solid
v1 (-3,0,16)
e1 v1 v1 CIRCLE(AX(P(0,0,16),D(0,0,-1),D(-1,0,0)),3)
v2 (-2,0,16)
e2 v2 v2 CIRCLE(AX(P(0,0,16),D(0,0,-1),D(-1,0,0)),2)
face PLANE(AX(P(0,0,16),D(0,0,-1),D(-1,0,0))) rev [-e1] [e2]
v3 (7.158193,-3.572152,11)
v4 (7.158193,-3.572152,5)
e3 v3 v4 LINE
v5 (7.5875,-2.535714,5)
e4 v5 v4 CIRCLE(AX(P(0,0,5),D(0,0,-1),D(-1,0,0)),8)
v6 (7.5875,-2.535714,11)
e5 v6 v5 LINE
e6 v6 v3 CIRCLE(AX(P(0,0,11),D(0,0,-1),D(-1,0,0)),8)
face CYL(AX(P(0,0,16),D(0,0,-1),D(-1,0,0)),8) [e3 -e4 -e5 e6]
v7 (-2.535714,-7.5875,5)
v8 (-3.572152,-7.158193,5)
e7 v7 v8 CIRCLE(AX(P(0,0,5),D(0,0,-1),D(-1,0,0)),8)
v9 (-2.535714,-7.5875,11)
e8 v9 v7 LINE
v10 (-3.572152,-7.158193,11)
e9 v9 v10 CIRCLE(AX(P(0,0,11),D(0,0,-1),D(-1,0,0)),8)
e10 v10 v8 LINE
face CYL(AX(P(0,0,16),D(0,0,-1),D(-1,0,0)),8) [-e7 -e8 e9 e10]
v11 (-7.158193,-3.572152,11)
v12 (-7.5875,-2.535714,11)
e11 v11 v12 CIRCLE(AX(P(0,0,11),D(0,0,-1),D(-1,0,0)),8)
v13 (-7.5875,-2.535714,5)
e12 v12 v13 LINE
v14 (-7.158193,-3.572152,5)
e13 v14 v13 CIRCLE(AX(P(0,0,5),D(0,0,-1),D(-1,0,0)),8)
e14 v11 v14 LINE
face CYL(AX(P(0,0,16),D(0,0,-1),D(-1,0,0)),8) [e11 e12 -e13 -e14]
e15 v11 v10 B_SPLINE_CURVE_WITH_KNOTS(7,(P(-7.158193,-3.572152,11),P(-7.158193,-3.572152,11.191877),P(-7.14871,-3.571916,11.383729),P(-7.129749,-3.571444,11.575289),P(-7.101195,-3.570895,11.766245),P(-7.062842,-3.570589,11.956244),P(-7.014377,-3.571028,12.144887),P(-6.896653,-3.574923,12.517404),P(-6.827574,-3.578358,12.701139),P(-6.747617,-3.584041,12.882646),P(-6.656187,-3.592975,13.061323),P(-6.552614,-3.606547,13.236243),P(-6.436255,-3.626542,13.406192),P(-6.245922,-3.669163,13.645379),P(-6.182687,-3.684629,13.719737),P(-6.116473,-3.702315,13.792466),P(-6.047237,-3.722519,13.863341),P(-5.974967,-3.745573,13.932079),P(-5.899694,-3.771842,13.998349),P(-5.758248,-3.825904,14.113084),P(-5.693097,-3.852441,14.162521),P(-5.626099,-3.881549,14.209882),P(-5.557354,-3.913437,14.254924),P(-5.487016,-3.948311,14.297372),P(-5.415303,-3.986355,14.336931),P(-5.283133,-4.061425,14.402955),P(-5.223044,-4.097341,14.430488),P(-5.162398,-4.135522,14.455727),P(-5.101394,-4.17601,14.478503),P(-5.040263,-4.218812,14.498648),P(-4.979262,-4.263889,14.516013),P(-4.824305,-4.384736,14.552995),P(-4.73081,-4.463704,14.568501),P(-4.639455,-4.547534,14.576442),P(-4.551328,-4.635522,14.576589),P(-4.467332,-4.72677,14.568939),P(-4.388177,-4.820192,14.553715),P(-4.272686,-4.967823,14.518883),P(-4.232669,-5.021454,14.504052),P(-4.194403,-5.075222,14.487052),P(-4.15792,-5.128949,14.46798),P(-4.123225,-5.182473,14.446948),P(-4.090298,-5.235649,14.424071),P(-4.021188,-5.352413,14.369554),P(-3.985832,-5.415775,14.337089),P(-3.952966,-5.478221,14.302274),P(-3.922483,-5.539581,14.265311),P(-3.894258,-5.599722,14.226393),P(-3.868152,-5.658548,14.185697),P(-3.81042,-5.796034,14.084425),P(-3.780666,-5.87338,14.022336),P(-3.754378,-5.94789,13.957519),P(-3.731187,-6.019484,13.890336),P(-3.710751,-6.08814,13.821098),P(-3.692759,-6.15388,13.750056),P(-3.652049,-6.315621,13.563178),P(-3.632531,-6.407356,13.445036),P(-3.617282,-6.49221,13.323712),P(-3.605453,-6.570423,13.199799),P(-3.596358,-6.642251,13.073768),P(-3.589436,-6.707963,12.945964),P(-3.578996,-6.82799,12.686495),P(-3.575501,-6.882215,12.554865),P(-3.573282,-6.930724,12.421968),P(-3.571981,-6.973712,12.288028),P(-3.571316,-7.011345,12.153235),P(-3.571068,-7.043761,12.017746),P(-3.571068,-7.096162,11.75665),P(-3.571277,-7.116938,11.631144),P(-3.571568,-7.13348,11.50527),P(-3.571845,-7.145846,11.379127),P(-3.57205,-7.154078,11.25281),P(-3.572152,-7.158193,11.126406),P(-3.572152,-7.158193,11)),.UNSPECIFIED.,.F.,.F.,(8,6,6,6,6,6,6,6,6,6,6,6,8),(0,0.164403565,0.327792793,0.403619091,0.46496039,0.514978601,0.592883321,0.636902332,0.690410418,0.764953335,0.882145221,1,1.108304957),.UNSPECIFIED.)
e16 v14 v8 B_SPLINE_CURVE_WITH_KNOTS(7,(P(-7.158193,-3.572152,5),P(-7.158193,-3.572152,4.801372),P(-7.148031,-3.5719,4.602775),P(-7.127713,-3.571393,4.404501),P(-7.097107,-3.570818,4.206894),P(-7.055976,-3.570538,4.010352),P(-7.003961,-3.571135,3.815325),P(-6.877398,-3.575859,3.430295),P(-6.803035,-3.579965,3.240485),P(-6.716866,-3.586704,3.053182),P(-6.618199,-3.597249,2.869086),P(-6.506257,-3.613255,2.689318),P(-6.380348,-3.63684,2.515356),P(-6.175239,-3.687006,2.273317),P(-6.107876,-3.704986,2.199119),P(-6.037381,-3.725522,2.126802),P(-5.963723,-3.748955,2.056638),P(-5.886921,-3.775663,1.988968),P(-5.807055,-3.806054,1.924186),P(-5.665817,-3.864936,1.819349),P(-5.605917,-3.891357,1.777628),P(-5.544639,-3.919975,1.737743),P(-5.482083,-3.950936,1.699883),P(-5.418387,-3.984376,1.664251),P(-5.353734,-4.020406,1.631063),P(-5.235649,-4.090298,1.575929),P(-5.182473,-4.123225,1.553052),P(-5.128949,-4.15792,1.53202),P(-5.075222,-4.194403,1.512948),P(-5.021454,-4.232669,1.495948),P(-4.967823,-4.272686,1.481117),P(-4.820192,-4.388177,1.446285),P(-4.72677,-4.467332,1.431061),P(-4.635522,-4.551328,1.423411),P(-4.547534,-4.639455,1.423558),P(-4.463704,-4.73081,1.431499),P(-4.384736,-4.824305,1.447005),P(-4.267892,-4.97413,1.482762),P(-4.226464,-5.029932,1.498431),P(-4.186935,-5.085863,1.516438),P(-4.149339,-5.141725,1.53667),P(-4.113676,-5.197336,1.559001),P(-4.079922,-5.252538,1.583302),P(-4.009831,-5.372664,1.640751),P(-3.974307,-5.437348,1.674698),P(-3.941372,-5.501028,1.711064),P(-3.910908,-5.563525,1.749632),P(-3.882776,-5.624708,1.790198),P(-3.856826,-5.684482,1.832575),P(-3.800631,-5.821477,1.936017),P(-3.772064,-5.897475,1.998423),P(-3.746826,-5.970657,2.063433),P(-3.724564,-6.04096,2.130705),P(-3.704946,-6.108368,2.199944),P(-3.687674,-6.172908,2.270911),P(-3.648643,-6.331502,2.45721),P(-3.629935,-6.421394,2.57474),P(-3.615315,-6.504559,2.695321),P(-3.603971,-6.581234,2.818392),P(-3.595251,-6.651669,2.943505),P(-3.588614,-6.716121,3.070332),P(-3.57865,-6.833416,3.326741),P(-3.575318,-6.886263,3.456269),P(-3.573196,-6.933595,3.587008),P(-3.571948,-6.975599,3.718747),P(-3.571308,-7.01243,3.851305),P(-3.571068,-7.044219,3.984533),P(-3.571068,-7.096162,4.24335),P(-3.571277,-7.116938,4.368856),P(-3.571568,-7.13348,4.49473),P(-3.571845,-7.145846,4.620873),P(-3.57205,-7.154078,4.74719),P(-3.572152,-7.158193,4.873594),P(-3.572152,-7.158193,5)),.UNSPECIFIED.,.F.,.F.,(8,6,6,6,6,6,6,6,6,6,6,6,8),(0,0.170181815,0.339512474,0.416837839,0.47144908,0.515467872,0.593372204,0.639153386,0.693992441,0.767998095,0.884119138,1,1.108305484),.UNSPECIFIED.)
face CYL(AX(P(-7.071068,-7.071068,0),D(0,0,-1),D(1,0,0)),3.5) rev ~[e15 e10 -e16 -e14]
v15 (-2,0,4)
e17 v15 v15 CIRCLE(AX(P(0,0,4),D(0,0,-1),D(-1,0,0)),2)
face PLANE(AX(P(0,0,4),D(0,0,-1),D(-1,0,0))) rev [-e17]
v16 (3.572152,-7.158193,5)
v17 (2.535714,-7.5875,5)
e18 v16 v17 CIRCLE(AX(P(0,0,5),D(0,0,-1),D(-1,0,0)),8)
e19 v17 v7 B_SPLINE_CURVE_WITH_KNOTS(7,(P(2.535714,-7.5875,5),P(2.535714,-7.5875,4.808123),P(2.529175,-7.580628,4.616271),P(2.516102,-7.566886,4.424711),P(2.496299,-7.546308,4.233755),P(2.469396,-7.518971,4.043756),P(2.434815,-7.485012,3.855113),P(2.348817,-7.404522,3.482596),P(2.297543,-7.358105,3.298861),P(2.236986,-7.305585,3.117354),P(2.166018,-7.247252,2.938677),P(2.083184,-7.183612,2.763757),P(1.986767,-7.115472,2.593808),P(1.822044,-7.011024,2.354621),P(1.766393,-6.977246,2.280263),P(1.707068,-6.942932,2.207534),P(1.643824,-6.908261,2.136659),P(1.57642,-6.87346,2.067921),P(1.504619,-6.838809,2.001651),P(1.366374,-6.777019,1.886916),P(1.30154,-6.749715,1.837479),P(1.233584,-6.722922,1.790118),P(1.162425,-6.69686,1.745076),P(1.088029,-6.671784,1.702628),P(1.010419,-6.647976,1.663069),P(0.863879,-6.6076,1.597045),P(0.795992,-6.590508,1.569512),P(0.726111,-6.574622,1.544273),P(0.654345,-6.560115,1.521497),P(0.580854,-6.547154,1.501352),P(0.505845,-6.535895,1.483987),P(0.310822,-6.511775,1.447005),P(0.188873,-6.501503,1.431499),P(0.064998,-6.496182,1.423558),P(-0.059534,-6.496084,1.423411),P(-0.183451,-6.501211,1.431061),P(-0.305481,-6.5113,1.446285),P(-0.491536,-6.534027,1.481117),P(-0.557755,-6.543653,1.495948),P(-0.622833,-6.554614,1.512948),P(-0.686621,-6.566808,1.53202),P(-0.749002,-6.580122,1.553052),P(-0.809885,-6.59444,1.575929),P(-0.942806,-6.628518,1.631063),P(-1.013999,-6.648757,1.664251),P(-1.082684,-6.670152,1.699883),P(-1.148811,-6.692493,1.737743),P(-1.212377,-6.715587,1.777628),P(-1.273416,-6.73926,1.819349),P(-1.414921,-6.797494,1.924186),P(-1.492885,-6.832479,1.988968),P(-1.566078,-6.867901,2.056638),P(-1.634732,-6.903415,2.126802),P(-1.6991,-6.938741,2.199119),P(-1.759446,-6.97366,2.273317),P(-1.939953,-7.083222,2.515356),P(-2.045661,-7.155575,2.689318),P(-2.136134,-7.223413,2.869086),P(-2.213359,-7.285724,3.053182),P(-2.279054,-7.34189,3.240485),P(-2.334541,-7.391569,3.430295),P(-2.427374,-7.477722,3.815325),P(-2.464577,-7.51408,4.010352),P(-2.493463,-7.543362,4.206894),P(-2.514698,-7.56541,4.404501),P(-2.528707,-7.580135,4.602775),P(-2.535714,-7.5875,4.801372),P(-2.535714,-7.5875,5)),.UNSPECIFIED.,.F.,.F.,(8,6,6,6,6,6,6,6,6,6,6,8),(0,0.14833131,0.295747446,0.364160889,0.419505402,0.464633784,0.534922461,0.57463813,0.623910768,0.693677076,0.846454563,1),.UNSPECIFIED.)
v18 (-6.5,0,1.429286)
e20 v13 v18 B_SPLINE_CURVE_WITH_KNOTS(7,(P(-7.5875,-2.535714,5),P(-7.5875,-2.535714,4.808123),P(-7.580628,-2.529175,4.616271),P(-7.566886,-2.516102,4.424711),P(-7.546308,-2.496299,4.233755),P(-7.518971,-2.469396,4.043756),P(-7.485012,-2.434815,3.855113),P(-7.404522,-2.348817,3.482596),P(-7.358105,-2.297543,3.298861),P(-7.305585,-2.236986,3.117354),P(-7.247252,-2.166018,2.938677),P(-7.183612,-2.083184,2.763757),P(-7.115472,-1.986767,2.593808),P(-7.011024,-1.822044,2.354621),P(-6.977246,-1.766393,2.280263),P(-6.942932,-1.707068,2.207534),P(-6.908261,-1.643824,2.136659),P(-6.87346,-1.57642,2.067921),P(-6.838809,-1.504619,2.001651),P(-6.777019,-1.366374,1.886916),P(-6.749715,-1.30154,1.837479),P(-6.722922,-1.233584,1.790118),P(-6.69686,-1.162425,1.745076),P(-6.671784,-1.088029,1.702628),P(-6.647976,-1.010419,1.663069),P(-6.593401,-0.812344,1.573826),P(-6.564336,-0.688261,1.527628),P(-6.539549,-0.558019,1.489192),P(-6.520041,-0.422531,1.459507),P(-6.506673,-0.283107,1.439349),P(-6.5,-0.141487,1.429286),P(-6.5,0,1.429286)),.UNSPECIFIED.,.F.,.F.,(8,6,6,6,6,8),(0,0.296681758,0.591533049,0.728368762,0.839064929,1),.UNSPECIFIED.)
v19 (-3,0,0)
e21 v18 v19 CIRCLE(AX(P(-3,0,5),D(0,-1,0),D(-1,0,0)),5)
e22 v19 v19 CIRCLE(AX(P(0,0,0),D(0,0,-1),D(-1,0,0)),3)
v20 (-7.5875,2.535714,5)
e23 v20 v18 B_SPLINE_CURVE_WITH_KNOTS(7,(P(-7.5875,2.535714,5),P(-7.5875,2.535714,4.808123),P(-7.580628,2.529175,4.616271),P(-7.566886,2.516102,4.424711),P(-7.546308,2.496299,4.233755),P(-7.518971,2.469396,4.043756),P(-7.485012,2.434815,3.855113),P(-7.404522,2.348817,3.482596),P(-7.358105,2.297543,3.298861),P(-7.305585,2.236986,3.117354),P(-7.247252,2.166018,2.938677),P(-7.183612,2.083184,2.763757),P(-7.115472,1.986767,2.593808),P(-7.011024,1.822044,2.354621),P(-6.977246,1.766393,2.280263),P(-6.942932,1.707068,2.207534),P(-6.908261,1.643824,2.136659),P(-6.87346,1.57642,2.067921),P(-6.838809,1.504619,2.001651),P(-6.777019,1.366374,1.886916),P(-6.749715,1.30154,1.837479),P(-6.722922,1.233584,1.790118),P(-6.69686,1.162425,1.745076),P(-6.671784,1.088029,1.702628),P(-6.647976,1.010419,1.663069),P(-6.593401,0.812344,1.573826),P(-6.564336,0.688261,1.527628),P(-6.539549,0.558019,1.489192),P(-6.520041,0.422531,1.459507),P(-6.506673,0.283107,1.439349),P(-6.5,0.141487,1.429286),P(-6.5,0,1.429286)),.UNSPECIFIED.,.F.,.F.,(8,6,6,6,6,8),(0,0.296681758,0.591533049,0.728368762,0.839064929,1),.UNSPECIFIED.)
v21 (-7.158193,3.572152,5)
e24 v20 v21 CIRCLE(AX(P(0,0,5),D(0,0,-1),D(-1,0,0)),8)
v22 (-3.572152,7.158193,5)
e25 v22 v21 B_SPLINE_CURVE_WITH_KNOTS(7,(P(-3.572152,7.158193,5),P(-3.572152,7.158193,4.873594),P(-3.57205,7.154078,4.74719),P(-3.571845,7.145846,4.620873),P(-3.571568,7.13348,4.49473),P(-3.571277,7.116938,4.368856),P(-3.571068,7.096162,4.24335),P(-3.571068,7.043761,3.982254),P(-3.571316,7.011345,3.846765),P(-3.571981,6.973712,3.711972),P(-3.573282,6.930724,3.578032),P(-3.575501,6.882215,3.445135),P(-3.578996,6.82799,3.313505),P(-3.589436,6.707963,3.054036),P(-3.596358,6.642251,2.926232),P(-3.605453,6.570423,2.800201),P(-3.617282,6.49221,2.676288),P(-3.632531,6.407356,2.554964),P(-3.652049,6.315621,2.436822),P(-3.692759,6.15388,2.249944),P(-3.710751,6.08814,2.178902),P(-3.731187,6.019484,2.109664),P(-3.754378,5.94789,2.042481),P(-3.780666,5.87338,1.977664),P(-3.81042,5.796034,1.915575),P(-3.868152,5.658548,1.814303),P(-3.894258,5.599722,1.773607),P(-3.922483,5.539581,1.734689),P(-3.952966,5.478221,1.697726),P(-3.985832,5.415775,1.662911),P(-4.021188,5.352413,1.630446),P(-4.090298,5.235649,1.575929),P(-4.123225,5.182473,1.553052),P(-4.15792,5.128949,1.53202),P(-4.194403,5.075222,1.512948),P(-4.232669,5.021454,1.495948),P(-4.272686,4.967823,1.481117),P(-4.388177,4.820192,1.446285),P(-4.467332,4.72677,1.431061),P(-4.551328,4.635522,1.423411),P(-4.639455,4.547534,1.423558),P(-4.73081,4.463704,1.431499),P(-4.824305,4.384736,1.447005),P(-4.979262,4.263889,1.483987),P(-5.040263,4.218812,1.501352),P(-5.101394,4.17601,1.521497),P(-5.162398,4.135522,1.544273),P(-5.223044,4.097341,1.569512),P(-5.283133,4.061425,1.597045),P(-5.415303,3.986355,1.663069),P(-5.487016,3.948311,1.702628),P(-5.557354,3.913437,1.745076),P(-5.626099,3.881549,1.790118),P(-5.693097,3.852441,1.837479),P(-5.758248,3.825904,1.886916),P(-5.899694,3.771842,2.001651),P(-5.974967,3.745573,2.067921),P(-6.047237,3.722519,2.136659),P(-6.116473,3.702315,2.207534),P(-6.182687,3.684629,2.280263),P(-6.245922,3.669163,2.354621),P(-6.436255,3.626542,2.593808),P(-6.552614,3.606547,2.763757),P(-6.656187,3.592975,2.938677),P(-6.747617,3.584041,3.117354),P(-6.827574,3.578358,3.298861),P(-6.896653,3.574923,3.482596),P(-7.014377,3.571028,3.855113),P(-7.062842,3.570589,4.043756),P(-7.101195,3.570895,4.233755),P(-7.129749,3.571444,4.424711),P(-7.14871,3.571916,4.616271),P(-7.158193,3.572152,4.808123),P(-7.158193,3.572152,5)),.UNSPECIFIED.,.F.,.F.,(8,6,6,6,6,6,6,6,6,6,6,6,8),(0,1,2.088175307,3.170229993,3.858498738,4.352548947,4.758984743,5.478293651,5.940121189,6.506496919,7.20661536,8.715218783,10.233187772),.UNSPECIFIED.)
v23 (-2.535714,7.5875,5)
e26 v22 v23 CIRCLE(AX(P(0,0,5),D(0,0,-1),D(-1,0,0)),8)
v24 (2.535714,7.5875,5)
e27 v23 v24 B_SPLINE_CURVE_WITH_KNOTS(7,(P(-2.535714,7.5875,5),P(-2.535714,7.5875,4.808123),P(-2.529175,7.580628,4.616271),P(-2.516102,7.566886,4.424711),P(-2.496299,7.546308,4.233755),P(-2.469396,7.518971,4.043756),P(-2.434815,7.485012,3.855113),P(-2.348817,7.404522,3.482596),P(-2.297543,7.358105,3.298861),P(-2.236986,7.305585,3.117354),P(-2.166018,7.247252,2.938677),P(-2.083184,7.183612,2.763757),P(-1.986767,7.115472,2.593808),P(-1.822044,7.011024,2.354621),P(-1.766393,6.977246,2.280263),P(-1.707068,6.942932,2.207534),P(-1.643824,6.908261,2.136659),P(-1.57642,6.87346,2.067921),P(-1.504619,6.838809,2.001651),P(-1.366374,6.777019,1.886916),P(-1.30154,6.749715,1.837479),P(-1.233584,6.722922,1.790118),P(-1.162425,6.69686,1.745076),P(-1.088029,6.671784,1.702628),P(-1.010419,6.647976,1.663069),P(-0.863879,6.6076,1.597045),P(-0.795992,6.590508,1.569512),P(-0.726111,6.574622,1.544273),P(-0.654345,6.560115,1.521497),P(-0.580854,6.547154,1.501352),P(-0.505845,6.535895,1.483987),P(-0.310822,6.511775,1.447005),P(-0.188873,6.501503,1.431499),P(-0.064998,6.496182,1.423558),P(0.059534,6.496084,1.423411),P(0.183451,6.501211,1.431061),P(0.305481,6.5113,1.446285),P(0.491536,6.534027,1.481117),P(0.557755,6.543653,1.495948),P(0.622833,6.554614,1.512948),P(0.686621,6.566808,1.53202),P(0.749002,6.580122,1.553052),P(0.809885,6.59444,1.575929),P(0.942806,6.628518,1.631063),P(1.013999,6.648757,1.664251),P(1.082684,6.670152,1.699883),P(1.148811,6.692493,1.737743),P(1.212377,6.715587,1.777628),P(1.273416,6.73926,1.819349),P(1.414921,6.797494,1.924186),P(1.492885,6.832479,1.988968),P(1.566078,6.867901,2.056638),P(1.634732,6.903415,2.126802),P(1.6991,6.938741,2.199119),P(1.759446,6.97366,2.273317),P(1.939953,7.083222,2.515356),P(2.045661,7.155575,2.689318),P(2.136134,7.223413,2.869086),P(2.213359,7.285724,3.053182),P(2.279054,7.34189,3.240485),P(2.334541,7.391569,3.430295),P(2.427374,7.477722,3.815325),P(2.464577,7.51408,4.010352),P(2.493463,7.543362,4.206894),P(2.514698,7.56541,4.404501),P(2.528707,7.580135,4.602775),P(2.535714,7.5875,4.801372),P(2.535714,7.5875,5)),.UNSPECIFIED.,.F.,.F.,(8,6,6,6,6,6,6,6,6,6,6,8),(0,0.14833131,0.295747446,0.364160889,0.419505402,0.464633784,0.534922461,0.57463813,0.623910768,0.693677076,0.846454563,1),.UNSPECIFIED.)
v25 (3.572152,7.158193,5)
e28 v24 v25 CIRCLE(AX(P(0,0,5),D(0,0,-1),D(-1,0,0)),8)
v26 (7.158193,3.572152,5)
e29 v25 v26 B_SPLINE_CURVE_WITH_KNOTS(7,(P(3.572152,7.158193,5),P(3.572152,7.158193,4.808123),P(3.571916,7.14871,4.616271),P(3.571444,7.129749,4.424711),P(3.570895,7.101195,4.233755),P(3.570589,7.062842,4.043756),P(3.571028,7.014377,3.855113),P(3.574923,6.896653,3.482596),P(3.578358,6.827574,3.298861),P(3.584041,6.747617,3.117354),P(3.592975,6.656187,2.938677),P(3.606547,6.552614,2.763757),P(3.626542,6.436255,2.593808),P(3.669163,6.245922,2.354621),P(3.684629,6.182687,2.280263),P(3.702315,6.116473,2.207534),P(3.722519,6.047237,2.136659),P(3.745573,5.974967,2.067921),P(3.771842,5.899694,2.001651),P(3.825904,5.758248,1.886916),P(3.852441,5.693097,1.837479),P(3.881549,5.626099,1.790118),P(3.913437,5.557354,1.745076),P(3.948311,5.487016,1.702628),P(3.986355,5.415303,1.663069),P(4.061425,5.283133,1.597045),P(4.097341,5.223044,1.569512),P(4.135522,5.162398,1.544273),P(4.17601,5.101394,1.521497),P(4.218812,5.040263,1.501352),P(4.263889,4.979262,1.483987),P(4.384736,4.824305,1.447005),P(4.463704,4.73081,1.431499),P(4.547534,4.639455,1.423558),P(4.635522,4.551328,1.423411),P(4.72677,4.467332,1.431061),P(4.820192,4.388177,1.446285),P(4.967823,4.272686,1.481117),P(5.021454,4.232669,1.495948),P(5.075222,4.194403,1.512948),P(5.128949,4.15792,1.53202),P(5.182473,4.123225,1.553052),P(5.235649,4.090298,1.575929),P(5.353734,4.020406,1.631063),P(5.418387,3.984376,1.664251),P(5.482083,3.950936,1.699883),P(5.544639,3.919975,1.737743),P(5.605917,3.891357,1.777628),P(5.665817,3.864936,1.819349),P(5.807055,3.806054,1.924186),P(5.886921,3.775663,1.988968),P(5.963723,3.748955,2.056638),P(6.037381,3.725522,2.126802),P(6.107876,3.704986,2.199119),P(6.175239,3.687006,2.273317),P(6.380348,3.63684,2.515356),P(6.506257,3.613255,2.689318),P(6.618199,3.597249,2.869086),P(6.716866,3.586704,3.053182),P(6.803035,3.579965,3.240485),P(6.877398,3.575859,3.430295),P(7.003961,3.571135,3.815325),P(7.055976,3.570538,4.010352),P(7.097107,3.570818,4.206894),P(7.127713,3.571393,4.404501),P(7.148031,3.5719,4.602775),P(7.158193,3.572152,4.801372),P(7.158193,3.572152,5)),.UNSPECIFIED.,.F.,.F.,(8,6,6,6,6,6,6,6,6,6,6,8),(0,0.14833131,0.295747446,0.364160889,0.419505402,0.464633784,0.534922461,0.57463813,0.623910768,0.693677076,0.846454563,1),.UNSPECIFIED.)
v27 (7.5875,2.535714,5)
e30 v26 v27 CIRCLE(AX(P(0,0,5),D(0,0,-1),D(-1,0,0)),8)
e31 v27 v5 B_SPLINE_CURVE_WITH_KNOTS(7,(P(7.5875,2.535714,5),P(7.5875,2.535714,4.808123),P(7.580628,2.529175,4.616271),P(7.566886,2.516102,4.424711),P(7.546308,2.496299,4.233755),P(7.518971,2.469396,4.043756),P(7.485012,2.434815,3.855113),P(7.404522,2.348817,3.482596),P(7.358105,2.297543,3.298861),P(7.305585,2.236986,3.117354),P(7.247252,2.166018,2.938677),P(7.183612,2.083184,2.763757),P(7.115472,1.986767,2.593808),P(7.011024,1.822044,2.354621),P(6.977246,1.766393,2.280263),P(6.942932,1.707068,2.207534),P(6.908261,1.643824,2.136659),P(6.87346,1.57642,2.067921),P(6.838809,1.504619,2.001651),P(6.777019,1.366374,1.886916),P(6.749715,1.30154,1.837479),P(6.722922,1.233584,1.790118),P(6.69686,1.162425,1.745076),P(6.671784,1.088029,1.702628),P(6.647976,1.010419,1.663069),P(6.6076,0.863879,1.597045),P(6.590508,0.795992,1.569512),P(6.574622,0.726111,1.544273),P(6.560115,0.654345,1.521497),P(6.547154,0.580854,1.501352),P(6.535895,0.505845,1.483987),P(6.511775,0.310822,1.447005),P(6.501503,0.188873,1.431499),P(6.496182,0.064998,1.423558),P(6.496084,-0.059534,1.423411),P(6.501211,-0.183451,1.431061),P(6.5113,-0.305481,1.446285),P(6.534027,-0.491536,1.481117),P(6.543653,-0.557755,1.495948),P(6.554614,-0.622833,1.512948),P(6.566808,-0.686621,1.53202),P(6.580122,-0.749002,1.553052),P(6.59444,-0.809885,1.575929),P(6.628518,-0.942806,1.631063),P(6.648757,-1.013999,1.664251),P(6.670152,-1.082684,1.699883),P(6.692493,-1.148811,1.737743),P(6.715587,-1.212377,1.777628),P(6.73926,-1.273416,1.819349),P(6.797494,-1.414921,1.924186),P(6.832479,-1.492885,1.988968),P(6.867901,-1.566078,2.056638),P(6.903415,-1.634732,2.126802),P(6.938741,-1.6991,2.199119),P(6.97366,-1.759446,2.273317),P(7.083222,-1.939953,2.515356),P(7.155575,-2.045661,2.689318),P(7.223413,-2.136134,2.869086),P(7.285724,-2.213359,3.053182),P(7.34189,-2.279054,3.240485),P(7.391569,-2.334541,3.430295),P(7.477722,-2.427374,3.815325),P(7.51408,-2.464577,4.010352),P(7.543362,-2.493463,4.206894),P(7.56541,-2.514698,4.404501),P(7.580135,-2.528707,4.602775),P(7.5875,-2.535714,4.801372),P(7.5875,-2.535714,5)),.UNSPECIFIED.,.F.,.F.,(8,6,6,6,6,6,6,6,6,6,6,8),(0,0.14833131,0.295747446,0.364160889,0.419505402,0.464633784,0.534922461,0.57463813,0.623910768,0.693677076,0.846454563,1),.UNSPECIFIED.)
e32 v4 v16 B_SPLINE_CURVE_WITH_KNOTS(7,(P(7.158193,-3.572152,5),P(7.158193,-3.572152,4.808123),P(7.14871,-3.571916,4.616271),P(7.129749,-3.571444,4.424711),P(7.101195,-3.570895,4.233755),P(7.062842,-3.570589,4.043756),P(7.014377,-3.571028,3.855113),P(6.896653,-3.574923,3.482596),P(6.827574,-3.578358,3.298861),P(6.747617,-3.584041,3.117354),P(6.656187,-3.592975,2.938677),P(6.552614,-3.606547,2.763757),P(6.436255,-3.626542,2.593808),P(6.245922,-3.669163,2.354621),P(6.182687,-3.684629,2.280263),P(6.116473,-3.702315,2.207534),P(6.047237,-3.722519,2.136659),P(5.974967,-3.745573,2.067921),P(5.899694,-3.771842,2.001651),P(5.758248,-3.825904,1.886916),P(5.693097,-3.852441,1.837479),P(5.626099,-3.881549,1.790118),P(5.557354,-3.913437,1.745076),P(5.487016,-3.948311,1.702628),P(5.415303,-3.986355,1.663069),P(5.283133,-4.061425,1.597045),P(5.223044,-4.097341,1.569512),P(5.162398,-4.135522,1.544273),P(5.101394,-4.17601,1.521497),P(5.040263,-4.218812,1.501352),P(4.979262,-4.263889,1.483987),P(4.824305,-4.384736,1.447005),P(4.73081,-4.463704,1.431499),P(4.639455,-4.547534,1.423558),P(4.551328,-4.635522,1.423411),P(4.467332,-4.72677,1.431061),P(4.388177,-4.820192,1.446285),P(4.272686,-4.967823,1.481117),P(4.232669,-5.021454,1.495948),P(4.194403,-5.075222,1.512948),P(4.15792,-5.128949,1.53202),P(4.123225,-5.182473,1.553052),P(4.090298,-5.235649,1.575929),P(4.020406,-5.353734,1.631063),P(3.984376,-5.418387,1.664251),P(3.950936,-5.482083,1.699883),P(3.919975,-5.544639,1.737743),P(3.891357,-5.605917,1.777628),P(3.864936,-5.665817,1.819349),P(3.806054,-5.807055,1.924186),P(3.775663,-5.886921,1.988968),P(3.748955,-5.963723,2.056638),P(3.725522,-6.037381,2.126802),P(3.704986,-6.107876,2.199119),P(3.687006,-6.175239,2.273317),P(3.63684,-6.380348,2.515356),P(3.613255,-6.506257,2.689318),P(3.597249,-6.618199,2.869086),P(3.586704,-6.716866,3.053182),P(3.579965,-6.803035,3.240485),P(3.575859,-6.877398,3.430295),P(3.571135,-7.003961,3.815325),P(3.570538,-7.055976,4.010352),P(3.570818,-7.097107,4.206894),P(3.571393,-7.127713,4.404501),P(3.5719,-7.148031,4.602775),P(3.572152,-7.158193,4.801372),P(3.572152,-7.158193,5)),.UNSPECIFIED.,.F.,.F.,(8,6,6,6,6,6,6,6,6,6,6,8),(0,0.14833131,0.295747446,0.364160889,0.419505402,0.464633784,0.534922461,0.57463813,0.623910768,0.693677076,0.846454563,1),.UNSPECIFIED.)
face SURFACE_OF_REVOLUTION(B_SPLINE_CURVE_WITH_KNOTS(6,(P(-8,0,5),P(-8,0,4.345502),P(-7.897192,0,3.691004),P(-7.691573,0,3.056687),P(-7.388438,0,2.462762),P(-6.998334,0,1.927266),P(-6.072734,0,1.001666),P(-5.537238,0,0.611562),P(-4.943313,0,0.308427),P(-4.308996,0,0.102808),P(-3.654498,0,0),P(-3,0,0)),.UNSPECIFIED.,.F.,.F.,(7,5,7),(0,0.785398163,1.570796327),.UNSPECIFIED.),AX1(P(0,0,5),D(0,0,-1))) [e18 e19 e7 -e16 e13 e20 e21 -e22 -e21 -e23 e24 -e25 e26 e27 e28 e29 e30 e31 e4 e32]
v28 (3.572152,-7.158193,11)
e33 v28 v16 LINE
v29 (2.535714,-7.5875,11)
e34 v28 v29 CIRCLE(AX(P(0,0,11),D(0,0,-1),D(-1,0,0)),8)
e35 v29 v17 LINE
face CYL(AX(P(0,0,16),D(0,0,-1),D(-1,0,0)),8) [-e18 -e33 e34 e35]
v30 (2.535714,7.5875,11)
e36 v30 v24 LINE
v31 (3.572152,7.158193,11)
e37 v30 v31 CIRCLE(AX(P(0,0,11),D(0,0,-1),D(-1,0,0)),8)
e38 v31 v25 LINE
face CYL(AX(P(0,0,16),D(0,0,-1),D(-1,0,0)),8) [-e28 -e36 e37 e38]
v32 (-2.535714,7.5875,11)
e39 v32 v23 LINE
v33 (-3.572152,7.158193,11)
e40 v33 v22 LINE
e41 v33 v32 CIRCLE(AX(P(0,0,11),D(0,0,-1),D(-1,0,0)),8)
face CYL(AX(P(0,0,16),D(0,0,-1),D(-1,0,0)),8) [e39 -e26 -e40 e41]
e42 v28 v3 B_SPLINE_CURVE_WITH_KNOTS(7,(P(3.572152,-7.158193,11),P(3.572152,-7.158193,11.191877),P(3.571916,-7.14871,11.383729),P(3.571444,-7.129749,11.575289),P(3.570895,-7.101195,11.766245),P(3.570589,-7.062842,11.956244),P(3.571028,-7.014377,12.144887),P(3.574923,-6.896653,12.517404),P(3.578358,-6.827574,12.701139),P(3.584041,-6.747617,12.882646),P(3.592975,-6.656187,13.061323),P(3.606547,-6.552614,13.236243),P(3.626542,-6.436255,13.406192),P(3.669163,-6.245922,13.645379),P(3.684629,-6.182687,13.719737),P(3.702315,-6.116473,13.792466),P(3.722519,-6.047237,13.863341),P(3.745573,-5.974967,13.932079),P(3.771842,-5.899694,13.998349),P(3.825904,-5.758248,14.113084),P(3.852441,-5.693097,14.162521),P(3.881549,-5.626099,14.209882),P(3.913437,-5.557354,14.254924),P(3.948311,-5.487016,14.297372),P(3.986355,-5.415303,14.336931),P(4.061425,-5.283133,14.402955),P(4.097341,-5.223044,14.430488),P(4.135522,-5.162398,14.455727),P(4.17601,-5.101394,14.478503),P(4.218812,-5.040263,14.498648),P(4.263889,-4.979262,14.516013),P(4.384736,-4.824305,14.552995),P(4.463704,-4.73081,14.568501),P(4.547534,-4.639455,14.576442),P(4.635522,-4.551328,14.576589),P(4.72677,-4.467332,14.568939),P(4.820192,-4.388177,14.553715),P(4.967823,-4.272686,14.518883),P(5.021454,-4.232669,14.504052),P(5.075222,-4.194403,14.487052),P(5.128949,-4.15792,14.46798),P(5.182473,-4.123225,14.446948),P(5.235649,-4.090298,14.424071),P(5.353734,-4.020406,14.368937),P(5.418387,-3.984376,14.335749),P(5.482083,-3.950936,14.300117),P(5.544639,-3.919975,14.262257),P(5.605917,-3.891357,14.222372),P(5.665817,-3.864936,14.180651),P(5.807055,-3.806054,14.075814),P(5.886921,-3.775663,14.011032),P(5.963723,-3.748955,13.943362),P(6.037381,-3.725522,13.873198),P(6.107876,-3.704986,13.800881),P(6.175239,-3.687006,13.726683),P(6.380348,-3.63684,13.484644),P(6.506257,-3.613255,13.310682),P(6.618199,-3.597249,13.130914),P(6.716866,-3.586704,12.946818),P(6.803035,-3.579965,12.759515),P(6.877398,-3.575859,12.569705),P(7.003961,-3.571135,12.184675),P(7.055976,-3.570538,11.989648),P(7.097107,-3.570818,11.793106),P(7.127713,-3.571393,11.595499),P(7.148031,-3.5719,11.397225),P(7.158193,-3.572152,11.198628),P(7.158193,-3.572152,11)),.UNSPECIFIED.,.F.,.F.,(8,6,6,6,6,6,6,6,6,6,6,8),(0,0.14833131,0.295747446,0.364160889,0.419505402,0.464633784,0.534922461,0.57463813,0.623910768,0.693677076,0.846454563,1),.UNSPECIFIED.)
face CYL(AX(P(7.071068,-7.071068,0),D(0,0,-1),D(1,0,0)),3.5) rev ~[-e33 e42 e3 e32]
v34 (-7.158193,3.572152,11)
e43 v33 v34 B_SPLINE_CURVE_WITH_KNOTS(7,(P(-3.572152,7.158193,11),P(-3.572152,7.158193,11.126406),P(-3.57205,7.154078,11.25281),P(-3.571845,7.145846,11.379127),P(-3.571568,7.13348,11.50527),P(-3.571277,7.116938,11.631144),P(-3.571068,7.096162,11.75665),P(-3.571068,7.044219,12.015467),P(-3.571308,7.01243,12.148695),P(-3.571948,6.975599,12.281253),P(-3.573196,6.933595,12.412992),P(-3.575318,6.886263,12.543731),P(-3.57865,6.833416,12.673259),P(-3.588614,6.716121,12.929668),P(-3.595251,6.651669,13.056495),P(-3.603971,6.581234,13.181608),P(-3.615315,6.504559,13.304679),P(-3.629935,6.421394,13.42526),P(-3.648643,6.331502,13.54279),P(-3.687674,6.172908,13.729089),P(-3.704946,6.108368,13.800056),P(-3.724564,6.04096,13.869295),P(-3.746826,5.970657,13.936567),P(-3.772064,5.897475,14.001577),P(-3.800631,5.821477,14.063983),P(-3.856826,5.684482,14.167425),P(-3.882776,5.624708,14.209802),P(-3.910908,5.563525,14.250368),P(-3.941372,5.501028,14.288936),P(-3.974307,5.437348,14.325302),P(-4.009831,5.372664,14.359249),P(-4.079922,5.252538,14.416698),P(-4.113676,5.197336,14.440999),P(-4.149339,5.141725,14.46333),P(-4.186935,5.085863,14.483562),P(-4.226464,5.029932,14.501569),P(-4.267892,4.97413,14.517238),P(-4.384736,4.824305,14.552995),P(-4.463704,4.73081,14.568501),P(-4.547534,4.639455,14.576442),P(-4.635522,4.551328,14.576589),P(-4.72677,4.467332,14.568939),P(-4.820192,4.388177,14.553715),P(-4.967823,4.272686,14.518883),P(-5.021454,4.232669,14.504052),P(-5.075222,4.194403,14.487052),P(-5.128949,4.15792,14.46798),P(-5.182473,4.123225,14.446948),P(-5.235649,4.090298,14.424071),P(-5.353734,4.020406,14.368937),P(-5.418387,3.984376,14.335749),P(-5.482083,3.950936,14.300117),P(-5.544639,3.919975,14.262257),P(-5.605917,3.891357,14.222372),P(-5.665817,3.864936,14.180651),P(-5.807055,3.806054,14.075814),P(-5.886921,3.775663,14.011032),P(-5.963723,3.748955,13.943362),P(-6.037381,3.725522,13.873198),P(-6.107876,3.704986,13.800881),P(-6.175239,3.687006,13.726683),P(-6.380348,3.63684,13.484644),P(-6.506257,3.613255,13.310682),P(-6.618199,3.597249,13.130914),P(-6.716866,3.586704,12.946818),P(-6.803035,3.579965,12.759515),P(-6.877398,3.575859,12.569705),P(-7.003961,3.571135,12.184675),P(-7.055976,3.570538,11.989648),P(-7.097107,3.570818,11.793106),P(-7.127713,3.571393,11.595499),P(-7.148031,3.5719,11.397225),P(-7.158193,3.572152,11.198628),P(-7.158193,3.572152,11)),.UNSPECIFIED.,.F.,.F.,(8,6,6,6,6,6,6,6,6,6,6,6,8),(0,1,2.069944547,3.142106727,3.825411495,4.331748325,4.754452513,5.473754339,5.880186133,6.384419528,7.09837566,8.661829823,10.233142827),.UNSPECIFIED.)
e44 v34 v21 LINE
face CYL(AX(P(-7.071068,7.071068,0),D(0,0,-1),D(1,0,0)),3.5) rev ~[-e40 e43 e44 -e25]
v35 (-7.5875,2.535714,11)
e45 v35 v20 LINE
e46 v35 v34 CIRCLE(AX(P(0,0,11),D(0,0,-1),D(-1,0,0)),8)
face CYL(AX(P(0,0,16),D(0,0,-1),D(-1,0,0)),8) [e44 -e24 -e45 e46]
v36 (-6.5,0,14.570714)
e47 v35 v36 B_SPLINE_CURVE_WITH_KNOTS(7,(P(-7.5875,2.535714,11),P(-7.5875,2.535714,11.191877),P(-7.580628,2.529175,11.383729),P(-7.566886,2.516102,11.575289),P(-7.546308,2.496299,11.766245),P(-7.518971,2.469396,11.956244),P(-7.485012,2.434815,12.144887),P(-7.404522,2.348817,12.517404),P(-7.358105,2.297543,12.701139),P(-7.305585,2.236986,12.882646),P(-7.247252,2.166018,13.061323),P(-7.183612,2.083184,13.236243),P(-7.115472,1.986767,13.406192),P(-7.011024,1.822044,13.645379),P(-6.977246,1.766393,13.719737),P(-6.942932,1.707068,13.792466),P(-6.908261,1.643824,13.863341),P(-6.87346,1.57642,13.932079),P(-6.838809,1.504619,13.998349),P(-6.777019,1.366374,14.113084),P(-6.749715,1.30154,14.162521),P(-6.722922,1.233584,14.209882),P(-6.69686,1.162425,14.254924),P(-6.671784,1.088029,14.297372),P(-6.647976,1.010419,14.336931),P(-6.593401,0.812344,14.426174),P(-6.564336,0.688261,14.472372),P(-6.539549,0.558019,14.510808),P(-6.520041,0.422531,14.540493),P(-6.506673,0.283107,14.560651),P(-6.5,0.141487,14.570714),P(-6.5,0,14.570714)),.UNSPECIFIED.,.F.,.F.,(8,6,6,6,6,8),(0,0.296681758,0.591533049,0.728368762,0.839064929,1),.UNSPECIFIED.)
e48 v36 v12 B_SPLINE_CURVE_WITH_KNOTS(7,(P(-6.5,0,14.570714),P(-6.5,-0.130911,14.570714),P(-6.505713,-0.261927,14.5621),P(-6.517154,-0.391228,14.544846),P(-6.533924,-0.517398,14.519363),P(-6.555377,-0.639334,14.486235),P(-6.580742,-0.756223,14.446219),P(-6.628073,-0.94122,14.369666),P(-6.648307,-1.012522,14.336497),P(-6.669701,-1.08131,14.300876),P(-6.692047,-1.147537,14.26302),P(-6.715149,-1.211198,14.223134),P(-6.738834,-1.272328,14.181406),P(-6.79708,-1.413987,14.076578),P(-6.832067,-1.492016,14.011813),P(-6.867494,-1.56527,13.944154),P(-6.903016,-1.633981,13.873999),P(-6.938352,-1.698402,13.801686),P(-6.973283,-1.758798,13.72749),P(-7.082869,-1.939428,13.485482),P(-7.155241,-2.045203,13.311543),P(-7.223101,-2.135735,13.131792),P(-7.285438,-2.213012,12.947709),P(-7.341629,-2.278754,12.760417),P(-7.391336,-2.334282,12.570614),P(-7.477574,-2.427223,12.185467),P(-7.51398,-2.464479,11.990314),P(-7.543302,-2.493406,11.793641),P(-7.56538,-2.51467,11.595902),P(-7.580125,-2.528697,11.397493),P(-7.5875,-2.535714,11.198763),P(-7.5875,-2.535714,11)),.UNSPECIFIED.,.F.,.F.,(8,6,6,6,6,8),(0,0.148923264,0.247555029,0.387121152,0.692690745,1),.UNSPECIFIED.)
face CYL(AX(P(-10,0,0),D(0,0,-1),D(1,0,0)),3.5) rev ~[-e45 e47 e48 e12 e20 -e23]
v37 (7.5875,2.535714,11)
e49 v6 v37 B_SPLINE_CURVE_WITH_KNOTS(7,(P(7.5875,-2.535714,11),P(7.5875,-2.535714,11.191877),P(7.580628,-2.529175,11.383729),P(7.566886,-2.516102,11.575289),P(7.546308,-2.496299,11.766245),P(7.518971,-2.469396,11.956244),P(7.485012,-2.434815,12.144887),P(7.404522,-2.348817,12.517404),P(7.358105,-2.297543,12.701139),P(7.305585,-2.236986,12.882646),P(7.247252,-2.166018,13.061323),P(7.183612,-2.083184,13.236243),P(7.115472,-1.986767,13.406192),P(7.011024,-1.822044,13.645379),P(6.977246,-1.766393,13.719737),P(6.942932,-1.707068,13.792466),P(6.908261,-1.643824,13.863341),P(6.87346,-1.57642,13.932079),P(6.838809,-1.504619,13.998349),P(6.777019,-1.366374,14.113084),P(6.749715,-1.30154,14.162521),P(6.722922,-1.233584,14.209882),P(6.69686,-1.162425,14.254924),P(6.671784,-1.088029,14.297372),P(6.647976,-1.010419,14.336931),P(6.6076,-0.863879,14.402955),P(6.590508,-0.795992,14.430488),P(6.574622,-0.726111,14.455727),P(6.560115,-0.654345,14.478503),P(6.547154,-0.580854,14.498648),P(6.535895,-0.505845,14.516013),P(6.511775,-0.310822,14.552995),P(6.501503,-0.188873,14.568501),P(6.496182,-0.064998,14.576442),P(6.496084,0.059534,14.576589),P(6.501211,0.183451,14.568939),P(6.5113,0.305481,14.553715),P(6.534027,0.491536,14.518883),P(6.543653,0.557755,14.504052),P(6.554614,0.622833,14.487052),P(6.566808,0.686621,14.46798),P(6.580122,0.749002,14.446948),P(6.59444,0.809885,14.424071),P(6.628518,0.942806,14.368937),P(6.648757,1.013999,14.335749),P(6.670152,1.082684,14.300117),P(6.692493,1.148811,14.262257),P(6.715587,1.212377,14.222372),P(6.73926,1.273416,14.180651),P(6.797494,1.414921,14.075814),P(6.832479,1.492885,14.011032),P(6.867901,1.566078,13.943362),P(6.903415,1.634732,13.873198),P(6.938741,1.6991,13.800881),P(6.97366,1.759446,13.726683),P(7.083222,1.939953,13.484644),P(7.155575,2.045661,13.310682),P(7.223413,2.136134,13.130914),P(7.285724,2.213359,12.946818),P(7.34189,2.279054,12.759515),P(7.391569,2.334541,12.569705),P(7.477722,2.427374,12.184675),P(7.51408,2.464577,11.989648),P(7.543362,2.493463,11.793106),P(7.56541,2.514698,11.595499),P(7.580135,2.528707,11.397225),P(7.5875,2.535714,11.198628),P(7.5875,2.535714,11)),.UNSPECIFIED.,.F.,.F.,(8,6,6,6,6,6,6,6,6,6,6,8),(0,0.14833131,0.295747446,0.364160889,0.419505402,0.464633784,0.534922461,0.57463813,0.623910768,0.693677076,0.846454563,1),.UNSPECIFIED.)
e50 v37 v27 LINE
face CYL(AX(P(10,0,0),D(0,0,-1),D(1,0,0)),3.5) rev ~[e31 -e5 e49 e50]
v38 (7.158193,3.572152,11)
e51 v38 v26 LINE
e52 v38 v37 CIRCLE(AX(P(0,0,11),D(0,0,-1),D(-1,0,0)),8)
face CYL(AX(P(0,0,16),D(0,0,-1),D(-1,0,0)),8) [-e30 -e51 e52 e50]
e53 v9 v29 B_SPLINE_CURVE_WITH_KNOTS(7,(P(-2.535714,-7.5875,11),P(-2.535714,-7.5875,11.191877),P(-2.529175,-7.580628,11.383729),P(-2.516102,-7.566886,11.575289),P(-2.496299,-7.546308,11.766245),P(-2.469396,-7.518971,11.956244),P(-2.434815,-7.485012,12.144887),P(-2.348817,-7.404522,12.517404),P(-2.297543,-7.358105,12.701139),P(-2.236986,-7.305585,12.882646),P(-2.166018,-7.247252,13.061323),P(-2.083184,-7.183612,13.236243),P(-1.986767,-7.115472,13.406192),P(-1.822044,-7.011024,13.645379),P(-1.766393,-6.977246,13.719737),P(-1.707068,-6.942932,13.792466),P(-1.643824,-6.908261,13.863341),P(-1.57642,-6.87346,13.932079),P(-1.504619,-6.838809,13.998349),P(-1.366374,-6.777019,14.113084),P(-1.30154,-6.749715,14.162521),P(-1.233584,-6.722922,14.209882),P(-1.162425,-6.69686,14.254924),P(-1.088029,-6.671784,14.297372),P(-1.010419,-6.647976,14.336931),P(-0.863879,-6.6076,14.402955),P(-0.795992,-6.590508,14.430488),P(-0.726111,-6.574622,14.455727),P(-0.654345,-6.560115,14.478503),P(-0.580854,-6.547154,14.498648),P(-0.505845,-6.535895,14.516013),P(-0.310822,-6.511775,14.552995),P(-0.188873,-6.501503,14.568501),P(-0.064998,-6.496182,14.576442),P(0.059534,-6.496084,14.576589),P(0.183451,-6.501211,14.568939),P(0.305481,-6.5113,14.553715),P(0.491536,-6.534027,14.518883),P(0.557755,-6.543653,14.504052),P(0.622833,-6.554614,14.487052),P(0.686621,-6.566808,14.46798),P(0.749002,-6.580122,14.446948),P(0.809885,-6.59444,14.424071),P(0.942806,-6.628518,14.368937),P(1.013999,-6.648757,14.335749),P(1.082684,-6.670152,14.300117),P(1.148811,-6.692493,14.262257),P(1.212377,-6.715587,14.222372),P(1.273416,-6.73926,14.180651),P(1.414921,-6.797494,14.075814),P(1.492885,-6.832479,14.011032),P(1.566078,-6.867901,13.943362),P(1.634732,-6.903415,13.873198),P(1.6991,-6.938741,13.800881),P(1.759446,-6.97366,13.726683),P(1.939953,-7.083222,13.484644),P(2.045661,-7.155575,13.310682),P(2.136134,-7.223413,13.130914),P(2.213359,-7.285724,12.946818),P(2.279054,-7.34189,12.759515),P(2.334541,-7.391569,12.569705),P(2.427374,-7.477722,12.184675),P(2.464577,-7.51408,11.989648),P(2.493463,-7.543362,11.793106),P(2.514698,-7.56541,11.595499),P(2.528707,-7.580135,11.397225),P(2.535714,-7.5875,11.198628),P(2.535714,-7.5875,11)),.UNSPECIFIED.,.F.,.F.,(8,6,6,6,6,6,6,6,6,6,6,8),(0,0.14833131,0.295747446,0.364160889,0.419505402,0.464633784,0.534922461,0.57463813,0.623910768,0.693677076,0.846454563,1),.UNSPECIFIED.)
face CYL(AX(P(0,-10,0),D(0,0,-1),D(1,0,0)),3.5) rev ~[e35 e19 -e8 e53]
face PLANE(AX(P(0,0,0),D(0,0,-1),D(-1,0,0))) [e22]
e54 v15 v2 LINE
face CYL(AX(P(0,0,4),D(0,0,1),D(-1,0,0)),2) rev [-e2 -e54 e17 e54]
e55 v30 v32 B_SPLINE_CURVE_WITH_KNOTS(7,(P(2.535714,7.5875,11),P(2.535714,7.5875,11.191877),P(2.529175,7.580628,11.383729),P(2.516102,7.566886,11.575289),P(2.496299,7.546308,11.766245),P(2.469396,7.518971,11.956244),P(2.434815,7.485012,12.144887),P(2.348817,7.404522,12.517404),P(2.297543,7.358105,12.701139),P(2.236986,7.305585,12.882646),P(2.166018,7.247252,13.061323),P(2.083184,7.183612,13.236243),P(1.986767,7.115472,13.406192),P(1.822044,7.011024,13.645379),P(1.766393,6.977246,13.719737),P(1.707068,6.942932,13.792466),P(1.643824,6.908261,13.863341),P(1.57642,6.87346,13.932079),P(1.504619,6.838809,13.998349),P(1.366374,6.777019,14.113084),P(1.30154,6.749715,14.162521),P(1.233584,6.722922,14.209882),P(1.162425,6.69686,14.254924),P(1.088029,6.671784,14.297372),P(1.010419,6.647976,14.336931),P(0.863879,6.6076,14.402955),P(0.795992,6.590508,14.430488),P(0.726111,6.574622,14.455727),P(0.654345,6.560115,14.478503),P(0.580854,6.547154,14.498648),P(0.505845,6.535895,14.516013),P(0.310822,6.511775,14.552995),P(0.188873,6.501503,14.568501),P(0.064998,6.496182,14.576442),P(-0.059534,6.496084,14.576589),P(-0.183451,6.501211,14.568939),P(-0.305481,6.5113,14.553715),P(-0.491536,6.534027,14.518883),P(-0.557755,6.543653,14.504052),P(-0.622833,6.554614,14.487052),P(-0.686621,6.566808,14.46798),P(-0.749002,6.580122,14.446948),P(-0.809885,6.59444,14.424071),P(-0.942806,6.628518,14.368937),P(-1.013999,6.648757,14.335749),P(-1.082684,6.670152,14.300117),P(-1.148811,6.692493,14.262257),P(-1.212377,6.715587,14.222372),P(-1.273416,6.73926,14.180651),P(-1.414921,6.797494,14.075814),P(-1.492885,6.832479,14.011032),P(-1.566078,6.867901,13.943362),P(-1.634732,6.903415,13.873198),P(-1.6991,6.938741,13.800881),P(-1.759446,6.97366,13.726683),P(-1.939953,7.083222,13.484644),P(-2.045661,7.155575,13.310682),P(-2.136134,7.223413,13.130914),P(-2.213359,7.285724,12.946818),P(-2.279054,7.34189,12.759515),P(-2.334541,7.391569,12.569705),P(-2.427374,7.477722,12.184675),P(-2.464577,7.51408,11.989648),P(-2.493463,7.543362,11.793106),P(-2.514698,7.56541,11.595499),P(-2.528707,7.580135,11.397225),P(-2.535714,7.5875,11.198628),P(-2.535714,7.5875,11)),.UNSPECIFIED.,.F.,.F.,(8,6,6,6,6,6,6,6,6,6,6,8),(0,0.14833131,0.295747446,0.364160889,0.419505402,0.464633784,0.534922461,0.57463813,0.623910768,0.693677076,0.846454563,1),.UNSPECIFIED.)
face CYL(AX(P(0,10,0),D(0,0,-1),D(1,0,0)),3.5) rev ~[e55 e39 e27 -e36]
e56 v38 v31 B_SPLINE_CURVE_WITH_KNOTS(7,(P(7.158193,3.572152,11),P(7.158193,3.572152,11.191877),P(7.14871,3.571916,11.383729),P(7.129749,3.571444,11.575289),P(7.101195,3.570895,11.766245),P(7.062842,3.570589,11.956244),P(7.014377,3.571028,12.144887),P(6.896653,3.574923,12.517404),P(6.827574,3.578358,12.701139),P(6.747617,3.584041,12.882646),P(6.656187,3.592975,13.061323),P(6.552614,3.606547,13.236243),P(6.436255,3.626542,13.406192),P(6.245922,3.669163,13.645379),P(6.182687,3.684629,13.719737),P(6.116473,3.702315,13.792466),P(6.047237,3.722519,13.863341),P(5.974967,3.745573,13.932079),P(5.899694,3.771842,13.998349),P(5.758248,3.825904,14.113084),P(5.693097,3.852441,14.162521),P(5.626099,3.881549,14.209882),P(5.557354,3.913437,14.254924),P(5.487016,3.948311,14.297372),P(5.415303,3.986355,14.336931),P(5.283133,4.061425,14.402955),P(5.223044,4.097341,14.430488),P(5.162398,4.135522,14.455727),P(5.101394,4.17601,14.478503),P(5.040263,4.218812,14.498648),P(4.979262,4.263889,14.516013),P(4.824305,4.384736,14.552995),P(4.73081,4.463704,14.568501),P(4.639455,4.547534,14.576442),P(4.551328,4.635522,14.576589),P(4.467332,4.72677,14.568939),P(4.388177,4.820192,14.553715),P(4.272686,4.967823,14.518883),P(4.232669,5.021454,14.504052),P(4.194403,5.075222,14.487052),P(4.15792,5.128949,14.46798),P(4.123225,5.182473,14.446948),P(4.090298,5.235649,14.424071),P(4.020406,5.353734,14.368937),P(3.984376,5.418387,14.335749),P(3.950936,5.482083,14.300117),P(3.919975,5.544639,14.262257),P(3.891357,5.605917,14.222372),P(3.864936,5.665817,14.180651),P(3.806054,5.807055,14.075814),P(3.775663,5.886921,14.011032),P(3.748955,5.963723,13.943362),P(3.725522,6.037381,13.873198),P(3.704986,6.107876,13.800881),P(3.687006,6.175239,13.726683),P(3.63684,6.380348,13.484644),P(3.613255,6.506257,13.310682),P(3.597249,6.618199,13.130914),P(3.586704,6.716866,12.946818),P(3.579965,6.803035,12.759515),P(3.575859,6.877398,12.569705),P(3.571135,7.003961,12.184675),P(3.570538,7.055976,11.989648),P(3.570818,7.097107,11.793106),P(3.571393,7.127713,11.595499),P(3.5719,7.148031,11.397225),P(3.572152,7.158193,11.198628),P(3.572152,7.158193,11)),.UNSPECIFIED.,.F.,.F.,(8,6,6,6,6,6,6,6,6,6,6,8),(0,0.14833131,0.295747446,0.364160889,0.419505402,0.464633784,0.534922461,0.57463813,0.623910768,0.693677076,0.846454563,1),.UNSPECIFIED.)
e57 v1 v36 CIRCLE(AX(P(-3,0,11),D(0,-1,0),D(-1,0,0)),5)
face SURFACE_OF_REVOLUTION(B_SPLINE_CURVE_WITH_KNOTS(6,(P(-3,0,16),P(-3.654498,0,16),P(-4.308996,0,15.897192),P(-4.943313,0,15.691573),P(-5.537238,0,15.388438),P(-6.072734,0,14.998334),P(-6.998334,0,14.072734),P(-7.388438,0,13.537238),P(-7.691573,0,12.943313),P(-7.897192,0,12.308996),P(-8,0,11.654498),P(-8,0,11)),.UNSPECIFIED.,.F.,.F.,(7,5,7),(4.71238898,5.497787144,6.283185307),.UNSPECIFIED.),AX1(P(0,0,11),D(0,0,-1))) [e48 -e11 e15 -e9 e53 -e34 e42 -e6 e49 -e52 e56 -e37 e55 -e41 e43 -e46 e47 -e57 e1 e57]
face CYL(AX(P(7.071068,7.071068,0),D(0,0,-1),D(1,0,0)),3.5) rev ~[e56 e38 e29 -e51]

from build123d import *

# Parameters (mm, degrees)
F2_R     = 5
F3_R     = 3.5
F4_DEPTH = 25


# Not quite as in the source:
# - a feature names something its author has since deleted; it is built from what else it names


with BuildPart() as f1:
    # F0 (on Front) → F1 (revolve)
    with BuildSketch(Plane.XZ):
        Polygon((-2, 4), (-2, 16), (-8, 16), (-8, 6), (-8, 0), (0, 0), (0, 4), align=None)
    revolve(axis=Axis((0, 0, 2), (0, 0, -1)))

    # F2
    f2_edges = [f1.edges().sort_by_distance(p)[0] for p in [
        (8, 0, 0),
        (8, 0, 16),
    ]]
    fillet(f2_edges, radius=F2_R)

    # F3 (on face) → F4 (cut)
    with BuildSketch(Plane(origin=(0, 0, 0), x_dir=(1, 0, 0), z_dir=(0, 0, -1))):
        with Locations((0, 10)):
            Circle(F3_R)
        with Locations((7.0710678119, 7.0710678119)):
            Circle(F3_R)
        with Locations((10, 0)):
            Circle(F3_R)
        with Locations((7.0710678119, -7.0710678119)):
            Circle(F3_R)
        with Locations((0, -10)):
            Circle(F3_R)
        with Locations((-7.0710678119, -7.0710678119)):
            Circle(F3_R)
        with Locations((-10, 0)):
            Circle(F3_R)
        with Locations((-7.0710678119, 7.0710678119)):
            Circle(F3_R)
    extrude(amount=-F4_DEPTH, mode=Mode.SUBTRACT)


solid = f1.part
